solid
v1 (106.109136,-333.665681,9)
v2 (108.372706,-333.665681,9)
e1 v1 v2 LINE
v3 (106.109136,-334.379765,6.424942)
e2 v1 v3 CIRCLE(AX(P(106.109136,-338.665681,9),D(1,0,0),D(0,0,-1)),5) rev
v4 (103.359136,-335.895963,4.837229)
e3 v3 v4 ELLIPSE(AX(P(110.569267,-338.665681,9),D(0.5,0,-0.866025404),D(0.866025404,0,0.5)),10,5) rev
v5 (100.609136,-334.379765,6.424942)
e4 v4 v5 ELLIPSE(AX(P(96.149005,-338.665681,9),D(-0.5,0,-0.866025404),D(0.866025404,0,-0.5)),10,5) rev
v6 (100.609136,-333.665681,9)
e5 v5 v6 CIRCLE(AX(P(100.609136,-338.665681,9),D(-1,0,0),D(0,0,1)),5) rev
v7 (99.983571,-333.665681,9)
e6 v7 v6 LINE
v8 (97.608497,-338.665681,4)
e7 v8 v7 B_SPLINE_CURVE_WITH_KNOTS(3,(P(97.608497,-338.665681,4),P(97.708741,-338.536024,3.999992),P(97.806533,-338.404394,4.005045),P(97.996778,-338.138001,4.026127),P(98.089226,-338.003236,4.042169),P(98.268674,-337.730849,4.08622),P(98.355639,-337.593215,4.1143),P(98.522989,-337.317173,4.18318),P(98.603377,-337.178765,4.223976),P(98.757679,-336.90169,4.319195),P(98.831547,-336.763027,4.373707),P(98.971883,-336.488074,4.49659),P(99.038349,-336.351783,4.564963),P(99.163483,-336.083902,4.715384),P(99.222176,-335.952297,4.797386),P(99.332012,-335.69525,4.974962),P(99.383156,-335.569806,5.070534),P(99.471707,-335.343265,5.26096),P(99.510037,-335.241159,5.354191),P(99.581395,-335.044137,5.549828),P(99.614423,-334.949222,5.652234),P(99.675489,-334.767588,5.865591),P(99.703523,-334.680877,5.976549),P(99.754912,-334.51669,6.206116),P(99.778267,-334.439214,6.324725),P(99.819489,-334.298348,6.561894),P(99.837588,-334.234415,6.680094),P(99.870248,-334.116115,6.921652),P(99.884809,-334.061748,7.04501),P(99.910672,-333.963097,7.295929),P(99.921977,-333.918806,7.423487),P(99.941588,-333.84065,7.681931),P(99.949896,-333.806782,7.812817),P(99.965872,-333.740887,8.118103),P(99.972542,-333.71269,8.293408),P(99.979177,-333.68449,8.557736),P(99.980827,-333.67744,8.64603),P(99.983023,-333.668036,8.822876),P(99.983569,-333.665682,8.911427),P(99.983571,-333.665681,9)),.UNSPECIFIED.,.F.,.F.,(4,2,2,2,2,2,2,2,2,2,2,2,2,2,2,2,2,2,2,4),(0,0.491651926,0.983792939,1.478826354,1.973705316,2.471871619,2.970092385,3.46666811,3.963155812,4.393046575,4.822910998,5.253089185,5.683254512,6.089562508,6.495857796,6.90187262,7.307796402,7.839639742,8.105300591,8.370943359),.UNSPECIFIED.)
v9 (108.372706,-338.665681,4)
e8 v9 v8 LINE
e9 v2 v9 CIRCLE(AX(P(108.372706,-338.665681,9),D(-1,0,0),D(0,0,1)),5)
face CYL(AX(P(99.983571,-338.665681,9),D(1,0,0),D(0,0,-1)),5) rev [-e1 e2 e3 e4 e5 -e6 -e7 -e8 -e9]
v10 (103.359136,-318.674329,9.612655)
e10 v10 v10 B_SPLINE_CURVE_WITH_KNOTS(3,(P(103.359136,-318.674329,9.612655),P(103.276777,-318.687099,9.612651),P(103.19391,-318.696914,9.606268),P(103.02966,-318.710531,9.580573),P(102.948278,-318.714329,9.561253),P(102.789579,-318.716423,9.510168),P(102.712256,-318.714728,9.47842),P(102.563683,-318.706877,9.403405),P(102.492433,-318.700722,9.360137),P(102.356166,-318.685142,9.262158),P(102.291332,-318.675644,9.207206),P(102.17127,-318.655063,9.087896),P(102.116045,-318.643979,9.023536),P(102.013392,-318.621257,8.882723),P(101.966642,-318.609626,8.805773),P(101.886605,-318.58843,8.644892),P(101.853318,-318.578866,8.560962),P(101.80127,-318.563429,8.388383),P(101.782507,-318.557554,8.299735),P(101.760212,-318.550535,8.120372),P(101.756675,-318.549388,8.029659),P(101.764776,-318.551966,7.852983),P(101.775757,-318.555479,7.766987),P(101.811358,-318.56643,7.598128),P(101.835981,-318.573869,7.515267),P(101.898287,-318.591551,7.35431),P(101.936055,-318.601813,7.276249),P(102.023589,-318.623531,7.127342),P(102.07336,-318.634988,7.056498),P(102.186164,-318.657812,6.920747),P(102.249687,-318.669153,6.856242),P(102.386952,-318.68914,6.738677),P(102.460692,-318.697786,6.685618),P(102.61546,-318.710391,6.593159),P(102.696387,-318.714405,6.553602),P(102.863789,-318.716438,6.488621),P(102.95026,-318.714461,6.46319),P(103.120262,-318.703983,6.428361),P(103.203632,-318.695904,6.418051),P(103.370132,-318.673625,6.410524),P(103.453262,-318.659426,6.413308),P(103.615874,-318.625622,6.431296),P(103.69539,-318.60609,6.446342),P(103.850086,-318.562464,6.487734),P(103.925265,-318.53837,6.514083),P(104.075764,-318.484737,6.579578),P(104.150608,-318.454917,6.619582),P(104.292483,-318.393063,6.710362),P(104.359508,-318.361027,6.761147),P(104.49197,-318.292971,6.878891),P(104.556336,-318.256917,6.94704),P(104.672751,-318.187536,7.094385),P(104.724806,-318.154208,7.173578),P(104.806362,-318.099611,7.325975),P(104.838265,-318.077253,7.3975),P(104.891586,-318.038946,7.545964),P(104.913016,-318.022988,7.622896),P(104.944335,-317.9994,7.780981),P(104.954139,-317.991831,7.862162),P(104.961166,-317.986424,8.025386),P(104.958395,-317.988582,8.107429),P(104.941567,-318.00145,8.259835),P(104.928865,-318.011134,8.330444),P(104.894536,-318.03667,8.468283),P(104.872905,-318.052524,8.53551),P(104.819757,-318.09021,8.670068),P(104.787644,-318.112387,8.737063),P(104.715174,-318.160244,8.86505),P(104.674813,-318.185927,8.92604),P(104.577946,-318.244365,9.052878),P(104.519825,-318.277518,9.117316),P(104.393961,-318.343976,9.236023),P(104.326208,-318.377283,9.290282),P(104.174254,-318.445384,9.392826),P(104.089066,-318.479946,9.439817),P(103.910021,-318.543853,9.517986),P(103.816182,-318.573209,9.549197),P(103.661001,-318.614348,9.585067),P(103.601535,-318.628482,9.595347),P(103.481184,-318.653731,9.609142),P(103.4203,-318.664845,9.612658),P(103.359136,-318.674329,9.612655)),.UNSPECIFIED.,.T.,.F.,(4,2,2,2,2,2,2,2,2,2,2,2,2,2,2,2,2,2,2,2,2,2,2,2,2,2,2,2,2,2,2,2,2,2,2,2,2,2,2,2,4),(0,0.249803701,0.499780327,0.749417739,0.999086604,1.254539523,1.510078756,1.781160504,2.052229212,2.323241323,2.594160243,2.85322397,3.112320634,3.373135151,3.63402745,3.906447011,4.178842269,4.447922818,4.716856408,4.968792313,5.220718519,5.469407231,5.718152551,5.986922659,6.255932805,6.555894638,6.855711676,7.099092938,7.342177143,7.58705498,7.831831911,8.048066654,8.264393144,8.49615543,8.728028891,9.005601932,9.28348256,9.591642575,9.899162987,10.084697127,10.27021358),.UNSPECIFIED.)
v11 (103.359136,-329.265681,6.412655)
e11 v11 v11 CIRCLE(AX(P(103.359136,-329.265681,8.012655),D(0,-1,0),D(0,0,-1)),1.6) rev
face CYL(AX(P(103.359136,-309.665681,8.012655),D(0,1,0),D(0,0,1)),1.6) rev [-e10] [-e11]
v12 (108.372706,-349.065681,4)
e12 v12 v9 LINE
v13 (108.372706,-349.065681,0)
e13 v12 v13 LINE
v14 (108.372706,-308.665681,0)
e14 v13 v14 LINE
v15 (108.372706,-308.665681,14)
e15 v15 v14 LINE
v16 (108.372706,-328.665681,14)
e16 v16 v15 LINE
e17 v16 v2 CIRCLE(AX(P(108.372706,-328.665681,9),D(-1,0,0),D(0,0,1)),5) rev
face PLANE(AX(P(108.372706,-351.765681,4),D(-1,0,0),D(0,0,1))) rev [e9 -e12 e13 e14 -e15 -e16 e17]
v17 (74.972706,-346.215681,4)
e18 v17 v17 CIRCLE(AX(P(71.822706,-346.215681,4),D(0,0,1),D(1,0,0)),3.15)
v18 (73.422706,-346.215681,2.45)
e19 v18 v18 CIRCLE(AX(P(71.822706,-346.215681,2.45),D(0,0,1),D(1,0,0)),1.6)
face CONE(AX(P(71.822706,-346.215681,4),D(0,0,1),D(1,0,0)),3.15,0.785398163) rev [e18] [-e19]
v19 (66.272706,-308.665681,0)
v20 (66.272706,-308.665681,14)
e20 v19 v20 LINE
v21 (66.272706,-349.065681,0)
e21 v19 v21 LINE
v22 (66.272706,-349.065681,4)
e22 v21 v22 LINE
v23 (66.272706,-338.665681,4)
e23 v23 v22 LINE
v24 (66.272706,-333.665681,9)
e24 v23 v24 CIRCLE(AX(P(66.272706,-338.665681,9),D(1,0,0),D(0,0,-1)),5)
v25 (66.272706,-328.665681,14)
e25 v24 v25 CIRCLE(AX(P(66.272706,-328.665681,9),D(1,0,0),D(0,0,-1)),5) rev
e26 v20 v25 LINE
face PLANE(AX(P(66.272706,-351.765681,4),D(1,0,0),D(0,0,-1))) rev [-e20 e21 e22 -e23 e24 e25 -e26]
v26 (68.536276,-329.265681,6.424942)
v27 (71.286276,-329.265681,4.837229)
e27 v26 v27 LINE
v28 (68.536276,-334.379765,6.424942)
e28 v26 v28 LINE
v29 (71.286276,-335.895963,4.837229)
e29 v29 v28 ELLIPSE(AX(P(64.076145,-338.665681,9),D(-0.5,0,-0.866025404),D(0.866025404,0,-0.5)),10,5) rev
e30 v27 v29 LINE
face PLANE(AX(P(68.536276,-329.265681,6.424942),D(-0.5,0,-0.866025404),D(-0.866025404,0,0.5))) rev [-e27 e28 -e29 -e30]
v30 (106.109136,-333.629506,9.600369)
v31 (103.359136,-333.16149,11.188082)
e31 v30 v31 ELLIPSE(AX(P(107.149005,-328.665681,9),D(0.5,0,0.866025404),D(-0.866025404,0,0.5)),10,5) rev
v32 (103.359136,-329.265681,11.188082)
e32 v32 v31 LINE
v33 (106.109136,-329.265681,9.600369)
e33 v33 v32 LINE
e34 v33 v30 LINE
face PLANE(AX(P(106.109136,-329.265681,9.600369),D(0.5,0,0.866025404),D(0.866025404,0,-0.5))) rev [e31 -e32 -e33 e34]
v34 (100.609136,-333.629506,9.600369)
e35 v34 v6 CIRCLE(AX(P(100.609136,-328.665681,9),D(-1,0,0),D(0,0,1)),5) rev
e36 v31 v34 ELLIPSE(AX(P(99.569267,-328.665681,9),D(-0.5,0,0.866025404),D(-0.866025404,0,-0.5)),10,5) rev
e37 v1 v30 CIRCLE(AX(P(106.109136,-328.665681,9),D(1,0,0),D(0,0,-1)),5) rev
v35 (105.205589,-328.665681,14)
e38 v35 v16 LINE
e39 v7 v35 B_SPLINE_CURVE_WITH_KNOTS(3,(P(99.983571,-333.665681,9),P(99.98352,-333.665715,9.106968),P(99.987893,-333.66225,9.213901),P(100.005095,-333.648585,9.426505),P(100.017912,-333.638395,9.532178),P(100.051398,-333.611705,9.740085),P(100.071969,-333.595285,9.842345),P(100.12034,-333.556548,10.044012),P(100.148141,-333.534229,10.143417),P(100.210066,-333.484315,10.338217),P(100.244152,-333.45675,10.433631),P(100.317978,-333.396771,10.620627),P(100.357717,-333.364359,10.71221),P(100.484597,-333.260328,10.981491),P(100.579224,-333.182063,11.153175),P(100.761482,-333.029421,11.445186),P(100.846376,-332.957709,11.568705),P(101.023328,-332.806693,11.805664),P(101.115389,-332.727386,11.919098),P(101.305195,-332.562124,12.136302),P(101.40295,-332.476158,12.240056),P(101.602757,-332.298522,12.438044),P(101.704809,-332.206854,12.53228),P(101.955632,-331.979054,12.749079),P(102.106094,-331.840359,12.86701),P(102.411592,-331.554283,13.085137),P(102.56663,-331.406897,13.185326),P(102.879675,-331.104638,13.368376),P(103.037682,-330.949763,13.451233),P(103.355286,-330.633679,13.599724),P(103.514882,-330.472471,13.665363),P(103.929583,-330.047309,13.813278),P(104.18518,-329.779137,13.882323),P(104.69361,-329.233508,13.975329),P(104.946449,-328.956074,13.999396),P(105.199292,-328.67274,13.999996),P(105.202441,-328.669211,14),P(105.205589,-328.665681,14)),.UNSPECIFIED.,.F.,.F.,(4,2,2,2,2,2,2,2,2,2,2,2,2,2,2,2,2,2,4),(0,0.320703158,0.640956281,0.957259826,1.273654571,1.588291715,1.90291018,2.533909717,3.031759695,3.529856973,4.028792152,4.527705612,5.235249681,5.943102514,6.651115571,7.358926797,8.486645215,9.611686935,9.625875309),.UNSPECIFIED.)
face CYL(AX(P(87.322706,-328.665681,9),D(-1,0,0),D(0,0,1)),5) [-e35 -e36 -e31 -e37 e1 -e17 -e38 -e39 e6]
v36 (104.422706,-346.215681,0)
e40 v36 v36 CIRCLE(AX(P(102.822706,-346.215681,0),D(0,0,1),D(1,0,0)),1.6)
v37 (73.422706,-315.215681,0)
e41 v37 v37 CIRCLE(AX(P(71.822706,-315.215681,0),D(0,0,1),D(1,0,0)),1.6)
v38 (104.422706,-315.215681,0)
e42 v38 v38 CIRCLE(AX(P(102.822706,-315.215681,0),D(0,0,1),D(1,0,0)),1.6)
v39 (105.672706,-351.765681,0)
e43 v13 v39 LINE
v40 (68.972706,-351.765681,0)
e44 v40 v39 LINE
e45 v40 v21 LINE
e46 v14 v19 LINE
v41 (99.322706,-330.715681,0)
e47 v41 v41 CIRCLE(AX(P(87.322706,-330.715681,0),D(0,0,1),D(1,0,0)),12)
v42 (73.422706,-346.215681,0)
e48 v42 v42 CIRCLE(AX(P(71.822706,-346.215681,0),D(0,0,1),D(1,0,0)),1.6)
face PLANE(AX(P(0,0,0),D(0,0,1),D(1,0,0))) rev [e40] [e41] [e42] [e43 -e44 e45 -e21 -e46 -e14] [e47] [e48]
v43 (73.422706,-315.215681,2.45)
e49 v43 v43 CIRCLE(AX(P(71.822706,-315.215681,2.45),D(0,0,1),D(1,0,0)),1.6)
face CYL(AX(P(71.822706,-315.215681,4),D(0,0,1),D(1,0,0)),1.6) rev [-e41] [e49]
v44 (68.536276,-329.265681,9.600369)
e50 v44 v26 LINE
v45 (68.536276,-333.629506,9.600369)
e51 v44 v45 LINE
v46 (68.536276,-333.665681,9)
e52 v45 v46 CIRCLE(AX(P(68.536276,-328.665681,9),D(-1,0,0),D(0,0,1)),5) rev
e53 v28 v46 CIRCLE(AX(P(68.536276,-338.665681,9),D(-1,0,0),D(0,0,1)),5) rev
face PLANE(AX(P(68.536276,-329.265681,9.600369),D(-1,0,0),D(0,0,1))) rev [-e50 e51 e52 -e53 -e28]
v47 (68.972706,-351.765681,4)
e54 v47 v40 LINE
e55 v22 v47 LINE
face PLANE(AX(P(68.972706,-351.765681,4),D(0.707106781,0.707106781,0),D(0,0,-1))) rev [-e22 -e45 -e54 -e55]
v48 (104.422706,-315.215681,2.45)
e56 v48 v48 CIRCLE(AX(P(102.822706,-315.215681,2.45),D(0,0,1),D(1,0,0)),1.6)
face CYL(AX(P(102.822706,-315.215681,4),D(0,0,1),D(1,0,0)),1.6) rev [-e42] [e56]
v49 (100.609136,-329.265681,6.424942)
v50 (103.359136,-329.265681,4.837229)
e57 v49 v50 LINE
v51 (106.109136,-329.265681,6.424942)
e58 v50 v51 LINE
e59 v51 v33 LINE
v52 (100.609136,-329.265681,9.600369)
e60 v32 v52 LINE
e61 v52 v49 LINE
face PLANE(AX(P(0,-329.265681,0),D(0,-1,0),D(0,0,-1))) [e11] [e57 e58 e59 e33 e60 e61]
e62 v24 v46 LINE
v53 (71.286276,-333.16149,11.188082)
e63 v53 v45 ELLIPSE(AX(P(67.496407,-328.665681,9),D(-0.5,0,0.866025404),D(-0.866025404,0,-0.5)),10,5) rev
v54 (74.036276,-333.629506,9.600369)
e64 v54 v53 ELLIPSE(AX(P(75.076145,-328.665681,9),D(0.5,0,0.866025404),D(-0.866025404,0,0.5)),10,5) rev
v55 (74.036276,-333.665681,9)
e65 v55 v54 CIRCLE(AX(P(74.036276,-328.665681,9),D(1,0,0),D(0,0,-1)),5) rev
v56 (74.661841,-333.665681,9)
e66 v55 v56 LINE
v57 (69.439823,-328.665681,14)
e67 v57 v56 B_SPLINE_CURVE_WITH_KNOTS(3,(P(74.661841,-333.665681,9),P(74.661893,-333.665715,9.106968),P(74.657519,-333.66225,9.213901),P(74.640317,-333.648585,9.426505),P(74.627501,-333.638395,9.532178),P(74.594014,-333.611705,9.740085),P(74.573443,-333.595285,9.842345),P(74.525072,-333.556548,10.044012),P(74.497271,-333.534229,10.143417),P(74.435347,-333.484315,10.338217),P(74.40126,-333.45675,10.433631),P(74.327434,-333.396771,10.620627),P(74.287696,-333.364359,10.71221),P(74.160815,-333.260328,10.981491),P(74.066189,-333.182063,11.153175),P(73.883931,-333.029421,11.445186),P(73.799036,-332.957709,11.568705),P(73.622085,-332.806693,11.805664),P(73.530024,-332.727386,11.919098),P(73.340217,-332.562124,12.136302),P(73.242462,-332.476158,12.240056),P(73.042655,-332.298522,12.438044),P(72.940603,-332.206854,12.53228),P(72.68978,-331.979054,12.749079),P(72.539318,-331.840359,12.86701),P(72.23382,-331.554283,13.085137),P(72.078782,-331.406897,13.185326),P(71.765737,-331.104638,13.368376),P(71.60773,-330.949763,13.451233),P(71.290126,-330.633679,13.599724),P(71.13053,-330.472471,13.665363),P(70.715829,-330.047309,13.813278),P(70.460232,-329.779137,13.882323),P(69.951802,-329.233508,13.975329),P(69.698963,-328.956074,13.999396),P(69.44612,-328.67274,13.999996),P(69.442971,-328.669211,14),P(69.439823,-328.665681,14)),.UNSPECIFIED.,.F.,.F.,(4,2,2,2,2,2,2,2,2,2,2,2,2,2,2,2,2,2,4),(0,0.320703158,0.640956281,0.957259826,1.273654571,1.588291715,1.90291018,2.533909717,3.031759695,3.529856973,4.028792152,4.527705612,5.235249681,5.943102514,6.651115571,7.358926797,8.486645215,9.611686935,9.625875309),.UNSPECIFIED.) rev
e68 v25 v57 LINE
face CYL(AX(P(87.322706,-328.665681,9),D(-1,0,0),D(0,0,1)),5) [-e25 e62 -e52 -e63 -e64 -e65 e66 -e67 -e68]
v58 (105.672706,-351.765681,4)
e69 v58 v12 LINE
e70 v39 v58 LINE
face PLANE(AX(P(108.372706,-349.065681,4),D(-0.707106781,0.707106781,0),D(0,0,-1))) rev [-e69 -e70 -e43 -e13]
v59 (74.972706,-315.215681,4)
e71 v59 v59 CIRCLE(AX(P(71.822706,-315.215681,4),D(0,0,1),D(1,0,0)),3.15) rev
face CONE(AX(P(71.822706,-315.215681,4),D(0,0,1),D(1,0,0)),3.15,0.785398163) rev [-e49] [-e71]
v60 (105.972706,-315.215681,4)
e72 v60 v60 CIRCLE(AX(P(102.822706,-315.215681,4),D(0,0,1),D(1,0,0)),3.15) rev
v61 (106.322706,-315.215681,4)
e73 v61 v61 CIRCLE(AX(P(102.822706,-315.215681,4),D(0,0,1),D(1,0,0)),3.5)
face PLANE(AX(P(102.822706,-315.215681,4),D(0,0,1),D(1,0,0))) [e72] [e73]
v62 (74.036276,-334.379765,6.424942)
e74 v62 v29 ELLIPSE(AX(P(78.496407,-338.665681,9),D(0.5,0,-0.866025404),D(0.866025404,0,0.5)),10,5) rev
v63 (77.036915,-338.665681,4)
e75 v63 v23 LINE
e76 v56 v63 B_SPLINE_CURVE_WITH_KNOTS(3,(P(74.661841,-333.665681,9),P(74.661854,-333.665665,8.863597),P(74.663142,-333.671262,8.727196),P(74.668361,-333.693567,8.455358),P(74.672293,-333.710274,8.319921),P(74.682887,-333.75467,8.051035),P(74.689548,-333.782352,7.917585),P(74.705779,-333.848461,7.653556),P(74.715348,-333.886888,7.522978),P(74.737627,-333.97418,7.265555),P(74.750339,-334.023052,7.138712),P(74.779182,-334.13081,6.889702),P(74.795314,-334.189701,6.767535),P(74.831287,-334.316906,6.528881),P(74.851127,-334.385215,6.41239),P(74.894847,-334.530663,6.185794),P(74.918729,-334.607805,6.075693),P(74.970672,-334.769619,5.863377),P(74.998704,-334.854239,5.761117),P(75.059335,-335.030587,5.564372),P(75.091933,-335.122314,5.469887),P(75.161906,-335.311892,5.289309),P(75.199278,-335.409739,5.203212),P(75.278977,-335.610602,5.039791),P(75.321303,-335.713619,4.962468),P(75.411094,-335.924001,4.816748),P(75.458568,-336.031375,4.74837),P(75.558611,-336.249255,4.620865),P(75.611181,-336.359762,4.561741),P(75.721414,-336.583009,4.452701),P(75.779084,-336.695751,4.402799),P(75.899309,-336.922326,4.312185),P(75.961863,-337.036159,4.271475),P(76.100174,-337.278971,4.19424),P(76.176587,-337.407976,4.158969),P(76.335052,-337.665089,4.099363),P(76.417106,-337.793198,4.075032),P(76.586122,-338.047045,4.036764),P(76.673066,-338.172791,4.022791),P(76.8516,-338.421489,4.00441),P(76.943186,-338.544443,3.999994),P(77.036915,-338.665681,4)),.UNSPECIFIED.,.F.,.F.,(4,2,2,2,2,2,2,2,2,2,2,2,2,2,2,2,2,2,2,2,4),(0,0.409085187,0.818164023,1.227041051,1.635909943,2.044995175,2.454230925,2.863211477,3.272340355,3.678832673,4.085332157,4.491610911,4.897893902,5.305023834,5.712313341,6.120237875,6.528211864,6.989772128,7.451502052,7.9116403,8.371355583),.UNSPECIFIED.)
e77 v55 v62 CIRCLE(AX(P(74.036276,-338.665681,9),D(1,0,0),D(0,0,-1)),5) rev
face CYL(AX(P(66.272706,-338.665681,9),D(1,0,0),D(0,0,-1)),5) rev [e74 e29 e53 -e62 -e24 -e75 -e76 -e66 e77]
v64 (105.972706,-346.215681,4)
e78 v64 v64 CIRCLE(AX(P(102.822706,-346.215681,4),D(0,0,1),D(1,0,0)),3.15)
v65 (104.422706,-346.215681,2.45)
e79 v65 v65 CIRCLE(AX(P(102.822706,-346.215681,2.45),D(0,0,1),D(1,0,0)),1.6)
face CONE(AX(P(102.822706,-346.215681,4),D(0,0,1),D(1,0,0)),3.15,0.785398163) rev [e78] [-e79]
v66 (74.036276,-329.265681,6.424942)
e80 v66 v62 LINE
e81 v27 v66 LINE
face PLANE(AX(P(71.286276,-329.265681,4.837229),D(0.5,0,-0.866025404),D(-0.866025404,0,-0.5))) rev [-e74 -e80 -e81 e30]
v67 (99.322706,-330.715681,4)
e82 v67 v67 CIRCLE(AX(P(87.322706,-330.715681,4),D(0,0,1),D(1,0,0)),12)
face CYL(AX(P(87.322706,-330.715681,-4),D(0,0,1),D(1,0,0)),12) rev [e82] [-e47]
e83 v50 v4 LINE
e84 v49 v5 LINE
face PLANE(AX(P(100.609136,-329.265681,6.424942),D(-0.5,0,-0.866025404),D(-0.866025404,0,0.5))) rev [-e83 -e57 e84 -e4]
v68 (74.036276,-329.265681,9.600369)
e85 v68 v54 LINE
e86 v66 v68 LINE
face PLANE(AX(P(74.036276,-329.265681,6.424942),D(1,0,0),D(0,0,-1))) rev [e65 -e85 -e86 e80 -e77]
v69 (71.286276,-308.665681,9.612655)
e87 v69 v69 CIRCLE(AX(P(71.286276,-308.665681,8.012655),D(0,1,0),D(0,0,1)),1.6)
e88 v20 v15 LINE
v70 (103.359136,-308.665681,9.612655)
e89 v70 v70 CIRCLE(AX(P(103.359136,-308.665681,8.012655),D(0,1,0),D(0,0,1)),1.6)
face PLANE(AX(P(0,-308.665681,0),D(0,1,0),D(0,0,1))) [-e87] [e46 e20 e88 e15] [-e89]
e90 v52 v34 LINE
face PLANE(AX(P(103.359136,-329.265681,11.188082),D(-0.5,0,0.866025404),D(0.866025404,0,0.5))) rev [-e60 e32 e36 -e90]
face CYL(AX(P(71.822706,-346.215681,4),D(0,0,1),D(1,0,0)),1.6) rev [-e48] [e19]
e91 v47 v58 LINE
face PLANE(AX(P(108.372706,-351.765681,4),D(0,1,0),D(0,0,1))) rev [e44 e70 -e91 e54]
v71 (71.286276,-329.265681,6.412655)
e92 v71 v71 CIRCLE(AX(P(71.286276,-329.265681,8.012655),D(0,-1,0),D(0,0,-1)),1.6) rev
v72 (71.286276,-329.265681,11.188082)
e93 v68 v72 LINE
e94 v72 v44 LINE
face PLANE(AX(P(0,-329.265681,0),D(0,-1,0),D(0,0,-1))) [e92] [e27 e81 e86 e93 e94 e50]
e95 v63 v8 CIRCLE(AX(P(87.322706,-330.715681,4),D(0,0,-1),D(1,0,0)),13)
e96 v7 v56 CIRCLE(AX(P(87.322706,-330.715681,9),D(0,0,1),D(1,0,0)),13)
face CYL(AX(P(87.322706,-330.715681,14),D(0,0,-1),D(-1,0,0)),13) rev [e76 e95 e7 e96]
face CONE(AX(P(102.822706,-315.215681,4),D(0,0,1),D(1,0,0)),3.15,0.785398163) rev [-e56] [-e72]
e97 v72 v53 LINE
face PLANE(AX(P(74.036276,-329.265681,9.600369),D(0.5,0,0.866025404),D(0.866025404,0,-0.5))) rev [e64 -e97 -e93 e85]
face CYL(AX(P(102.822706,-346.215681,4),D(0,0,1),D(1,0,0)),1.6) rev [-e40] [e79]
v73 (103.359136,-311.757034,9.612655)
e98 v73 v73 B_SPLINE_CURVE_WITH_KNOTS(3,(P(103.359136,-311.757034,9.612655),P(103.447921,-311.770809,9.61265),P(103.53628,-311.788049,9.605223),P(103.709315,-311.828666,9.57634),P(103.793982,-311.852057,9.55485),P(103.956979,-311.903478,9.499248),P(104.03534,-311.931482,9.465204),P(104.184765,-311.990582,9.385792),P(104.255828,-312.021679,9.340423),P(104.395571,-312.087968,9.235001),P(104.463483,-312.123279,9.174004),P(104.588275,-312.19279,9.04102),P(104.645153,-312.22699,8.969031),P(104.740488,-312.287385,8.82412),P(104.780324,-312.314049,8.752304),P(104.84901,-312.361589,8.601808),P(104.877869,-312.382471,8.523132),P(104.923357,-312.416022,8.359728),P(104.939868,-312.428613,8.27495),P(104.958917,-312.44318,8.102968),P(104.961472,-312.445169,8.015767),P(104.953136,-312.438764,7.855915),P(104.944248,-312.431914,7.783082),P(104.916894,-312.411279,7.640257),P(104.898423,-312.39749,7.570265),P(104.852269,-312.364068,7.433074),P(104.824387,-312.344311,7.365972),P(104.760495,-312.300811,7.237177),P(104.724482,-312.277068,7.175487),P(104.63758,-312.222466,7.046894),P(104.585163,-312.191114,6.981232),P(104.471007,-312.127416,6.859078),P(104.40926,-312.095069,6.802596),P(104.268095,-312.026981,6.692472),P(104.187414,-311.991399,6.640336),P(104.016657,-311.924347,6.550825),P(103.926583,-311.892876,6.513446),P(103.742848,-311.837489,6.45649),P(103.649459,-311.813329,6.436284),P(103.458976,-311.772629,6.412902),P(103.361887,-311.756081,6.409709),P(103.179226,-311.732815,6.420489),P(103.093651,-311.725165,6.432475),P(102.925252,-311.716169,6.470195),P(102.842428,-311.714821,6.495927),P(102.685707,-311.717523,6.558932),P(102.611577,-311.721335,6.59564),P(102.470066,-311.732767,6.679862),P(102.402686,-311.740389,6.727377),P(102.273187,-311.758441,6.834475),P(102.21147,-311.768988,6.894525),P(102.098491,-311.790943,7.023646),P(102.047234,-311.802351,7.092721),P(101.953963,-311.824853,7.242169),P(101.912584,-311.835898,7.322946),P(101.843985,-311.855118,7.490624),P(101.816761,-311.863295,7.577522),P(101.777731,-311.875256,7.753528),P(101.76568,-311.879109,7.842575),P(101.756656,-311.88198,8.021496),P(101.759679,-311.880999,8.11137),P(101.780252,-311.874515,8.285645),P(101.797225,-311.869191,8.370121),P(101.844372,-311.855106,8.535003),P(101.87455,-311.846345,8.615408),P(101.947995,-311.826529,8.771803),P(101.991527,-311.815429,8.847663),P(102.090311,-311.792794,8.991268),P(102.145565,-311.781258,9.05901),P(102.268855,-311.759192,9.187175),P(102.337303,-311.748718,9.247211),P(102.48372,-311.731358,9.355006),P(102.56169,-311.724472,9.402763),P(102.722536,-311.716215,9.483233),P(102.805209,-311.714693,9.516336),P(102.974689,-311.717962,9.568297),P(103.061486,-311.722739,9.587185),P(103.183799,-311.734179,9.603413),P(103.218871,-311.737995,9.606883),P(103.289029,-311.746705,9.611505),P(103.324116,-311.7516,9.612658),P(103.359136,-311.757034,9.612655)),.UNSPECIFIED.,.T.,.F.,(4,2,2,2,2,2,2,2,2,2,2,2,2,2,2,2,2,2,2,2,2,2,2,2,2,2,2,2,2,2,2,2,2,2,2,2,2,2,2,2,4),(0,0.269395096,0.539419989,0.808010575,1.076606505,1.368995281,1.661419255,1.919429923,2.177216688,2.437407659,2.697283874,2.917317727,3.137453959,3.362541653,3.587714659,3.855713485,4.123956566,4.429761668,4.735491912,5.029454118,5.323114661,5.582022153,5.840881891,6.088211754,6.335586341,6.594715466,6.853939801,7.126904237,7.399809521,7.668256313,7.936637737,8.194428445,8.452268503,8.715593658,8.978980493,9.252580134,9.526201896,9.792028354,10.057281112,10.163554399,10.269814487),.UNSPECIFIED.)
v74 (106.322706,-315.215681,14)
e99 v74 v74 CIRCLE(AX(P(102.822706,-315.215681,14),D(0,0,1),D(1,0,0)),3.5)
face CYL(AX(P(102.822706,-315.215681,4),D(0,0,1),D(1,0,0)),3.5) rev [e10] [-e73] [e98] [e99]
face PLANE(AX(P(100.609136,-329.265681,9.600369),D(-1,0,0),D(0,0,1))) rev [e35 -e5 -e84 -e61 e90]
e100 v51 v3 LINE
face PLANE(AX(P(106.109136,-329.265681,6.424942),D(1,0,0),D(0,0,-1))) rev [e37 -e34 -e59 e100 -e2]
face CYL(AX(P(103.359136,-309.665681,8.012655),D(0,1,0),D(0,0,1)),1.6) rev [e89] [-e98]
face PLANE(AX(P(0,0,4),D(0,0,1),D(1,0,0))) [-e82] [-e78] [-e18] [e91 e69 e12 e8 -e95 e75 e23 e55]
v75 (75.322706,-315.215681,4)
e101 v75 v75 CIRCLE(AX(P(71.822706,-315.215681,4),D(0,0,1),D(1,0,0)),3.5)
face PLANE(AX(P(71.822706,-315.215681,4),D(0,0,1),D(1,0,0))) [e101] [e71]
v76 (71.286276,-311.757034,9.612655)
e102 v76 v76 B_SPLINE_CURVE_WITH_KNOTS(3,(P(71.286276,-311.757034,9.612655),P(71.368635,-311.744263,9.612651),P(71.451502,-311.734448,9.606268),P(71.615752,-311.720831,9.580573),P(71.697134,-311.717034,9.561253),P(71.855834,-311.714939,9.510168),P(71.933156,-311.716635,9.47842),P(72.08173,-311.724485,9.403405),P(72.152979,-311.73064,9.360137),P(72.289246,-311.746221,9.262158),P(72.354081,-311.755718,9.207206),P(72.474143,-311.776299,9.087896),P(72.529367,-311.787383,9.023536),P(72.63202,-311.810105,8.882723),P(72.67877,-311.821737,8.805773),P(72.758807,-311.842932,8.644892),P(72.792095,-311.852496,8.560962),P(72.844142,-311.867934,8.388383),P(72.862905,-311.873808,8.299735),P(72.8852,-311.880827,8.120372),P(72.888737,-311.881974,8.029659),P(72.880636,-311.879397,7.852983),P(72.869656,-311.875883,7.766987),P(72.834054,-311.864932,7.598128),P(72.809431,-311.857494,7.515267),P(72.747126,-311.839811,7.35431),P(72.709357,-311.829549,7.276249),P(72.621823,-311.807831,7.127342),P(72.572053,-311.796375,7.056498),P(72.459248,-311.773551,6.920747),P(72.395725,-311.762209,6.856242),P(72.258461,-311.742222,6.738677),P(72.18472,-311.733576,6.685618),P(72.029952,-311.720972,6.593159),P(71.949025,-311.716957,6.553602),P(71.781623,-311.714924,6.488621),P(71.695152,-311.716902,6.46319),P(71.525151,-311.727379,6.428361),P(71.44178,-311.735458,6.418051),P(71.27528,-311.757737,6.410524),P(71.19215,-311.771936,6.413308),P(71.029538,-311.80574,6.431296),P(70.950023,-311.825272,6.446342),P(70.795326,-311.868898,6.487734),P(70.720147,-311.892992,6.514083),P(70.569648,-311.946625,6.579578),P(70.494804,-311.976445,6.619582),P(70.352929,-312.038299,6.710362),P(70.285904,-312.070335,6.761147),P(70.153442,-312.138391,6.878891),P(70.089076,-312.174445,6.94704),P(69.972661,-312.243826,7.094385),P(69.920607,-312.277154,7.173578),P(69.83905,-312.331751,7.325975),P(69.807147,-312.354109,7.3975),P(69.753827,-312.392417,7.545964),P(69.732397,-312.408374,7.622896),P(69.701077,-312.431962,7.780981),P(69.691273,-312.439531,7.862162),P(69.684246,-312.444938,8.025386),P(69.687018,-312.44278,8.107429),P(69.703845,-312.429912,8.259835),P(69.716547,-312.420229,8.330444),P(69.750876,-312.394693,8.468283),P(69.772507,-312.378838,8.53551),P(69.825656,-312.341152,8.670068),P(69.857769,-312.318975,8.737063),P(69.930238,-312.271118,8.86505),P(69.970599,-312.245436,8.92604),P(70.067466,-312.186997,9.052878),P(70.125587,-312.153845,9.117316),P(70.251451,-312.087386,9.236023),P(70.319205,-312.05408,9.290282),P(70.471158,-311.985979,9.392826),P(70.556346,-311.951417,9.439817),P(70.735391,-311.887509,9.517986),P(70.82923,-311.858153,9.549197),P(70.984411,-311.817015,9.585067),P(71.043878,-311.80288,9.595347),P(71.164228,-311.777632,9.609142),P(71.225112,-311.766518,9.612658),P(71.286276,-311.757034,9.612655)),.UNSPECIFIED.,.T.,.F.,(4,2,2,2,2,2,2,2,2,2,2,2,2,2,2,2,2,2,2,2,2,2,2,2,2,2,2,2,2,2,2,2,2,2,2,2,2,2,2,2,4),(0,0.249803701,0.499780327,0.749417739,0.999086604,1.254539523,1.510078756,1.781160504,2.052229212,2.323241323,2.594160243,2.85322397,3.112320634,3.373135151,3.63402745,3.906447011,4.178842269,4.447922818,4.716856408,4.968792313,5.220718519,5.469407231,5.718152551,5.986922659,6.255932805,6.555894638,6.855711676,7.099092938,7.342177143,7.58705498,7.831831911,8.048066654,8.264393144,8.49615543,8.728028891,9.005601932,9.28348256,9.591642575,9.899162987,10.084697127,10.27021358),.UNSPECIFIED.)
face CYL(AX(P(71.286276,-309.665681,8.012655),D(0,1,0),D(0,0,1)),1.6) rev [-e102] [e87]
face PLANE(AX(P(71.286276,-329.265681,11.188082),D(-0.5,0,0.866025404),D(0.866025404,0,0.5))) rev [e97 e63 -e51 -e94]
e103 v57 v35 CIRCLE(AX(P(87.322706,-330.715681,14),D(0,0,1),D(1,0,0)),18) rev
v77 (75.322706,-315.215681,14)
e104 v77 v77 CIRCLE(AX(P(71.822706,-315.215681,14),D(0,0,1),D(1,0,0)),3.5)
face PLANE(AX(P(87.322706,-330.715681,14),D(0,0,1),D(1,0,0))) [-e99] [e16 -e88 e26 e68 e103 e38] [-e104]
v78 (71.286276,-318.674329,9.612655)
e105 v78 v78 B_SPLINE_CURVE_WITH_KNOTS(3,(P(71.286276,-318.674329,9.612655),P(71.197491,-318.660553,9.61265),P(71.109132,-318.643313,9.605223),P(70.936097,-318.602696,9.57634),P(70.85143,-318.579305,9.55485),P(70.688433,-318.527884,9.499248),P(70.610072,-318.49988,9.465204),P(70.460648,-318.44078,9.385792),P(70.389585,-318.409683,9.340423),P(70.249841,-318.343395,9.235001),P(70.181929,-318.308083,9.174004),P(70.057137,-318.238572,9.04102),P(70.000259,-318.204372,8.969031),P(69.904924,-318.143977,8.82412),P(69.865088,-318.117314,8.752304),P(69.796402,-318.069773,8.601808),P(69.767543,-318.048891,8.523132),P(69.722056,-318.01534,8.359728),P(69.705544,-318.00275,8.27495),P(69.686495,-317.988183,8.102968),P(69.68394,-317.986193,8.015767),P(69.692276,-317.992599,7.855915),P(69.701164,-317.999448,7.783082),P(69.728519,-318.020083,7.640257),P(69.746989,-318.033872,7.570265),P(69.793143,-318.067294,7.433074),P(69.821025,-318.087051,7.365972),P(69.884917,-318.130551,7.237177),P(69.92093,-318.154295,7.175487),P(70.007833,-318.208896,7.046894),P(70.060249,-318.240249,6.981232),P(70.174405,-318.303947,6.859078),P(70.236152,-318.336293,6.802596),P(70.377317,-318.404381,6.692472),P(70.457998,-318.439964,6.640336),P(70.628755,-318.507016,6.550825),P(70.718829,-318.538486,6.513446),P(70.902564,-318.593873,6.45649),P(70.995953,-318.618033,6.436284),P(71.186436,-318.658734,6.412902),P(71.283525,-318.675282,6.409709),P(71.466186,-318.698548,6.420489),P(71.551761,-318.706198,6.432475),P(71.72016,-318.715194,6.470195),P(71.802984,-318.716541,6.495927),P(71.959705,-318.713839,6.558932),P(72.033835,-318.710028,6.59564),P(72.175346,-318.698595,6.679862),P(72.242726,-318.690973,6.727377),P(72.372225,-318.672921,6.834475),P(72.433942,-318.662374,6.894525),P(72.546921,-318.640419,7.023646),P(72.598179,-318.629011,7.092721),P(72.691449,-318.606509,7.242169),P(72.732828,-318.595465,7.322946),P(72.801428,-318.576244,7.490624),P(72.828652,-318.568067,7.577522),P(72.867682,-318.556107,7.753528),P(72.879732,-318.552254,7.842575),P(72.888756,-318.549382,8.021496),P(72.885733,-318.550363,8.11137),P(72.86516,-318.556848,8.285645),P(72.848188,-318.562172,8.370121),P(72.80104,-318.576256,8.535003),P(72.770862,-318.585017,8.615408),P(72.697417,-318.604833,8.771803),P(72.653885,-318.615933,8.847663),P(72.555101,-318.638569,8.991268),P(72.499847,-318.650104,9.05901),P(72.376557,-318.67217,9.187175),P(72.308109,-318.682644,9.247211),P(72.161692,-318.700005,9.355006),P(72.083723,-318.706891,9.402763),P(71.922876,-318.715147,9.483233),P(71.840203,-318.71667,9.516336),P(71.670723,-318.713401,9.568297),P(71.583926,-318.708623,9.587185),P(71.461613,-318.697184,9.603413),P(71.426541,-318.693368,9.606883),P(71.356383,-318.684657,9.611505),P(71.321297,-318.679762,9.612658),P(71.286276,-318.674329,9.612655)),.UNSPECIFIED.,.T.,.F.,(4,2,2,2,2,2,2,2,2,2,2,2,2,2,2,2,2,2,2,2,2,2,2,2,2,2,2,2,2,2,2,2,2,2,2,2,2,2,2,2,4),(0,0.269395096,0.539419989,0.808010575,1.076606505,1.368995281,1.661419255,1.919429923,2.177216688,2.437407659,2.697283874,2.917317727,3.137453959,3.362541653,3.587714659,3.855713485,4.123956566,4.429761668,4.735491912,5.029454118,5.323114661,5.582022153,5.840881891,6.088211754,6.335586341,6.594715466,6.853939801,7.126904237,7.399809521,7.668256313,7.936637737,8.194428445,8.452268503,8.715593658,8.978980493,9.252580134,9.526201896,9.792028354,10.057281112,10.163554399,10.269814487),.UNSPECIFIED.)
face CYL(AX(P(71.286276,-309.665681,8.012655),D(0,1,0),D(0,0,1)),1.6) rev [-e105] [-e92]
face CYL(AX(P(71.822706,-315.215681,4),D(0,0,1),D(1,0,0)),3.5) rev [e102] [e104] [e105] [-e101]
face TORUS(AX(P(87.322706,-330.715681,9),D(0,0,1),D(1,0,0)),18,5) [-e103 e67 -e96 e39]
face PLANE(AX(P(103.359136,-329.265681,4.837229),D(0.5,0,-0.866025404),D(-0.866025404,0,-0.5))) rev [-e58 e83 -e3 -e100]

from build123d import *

# Parameters (mm, degrees)
ESBO_O1_W                                            = 42.10000000000001
ESBO_O1_H                                            = 42.10000000000002
RESSALTO_EXTRUS_O1_DEPTH                             = 4
ESBO_O2_R                                            = 12.000000000000007
CORTE_EXTRUS_O1_DEPTH                                = 8
ESCAREADO_PARA_PARAFUSO_DE_M_QUINA_COM_C_D           = 3.2
ESCAREADO_PARA_PARAFUSO_DE_M_QUINA_COM_C_CSINK_D     = 6.3
ESCAREADO_PARA_PARAFUSO_DE_M_QUINA_COM_C_CSINK_ANGLE = 90
RESSALTO_EXTRUS_O2_DEPTH                             = 10
ESBO_O6_R                                            = 3.5000000000000075
CORTE_EXTRUS_O2_DEPTH                                = 10.000000000000002
FURO_COM_FOLGA_DE_M31_D                              = 3.2
FILETE1_R                                            = 5
CORTE_EXTRUS_O6_DEPTH                                = 22.500000000000007
CHANFRO1_SIZE                                        = 2.7
SKETCH2_W                                            = 42.10000000000001
SKETCH2_H                                            = 14.000000000000002
SKETCH2_R                                            = 1.5999999999999908
BOSS_EXTRUDE1_DEPTH                                  = 1


with BuildPart() as part:
    # Esboço1 → Ressalto-extrusão1 (new body)
    with BuildSketch(Plane.XY):
        with Locations((87.32270610713223, -330.71568115646056)):
            Rectangle(ESBO_O1_W, ESBO_O1_H)
    extrude(amount=RESSALTO_EXTRUS_O1_DEPTH)

    # Esboço2 → Corte-extrusão1 (cut)
    with BuildSketch(Plane.XY.offset(4)):
        with Locations((87.32270610713225, -330.71568115646056)):
            Circle(ESBO_O2_R)
    extrude(amount=-CORTE_EXTRUS_O1_DEPTH, mode=Mode.SUBTRACT)

    # Escareado para parafuso de máquina com cabeça chata de M31 (through all)
    with Locations(Plane.XY.offset(4)):
        with Locations((102.822706107, -346.215681156), (102.822706107, -315.215681156), (71.822706107, -315.215681156), (71.822706107, -346.215681156)):
            CounterSinkHole(ESCAREADO_PARA_PARAFUSO_DE_M_QUINA_COM_C_D / 2, ESCAREADO_PARA_PARAFUSO_DE_M_QUINA_COM_C_CSINK_D / 2, counter_sink_angle=ESCAREADO_PARA_PARAFUSO_DE_M_QUINA_COM_C_CSINK_ANGLE)

    # Esboço5 → Ressalto-extrusão2 (add)
    with BuildSketch(Plane.XY.offset(4)):
        with BuildLine():
            Line((99.98357100649832, -333.66568115646055), (108.37270610713225, -333.66568115646055))
            Line((108.37270610713225, -333.66568115646055), (108.37270610713225, -309.66568115646055))
            Line((108.37270610713225, -309.66568115646055), (66.27270610713224, -309.66568115646055))
            Line((66.27270610713224, -309.66568115646055), (66.27270610713224, -333.66568115646055))
            Line((66.27270610713224, -333.66568115646055), (74.66184120776617, -333.66568115646055))
            ThreePointArc((74.66184120776617, -333.66568115646055), (87.32270610713225, -317.71568115646056), (99.98357100649832, -333.66568115646055))
        make_face()
    extrude(amount=RESSALTO_EXTRUS_O2_DEPTH)

    # Esboço6 → Corte-extrusão2 (cut)
    with BuildSketch(Plane.XY.offset(14)):
        with Locations((71.82270610713223, -315.21568115646056)):
            Circle(ESBO_O6_R)
        with Locations((102.82270610713226, -315.21568115646056)):
            Circle(ESBO_O6_R)
    extrude(amount=-CORTE_EXTRUS_O2_DEPTH, mode=Mode.SUBTRACT)

    # Furo com folga de M31 (through all)
    with Locations(Plane(origin=(0, -309.66568115646055, 0), x_dir=(1, 0, 0), z_dir=(0, 1, 0))):
        with Locations((103.359135837, -8.012655369), (71.286276377, -8.012655369)):
            Hole(FURO_COM_FOLGA_DE_M31_D / 2)

    # Filete1
    # the kernel refuses this fillet: 5 mm, written as the material it adds along each edge
    with BuildSketch(Plane(origin=(87.48357100649832, -333.66568115646055, 4), x_dir=(0, -1, 0), z_dir=(1, 0, 0))) as filete1_piece_1_section:
        with BuildLine():
            CenterArc((FILETE1_R, -FILETE1_R), FILETE1_R, 90, 90)
            Line((0, -FILETE1_R), (0, 0))
            Line((0, 0), (FILETE1_R, 0))
        make_face()
    filete1_piece_1 = extrude(amount=20.889135100633922, mode=Mode.PRIVATE)
    filete1_piece_1 = filete1_piece_1 - Plane(origin=(87.32270610713225, -330.71568115646056, 5.015859225762799), x_dir=(-0.9739126845666216, -0.22692307692307614, 0), z_dir=(0, 0, -1)) * Cylinder(12.999999999999995, 62, mode=Mode.PRIVATE)
    filete1_piece_1 = filete1_piece_1 - Plane(origin=(103.359135837, -334.8905504329836, 8.012655369), x_dir=(-1, 0, 0), z_dir=(0, -1, 0)) * Cylinder(1.6, 62, mode=Mode.PRIVATE)
    add(filete1_piece_1)
    with BuildSketch(Plane(origin=(66.27270610713224, -333.66568115646055, 4), x_dir=(0, -1, 0), z_dir=(1, 0, 0))) as filete1_piece_2_section:
        with BuildLine():
            CenterArc((FILETE1_R, -FILETE1_R), FILETE1_R, 90, 90)
            Line((0, -FILETE1_R), (0, 0))
            Line((0, 0), (FILETE1_R, 0))
        make_face()
    filete1_piece_2 = extrude(amount=20.889135100633936, mode=Mode.PRIVATE)
    filete1_piece_2 = filete1_piece_2 - Plane(origin=(87.32270610713225, -330.71568115646056, 5.01585849038902), x_dir=(-0.9739126845666216, -0.22692307692307614, 0), z_dir=(0, 0, -1)) * Cylinder(12.999999999999995, 62, mode=Mode.PRIVATE)
    filete1_piece_2 = filete1_piece_2 - Plane(origin=(71.286276377, -334.8905494522985, 8.012655369), x_dir=(-1, 0, 0), z_dir=(0, -1, 0)) * Cylinder(1.6, 62, mode=Mode.PRIVATE)
    add(filete1_piece_2)
    # the kernel refuses this fillet: 5 mm, written as the material it takes off along each edge
    with BuildSketch(Plane(origin=(87.32270610713225, -330.71568115646056, 14), x_dir=(-0.36935058707522056, -0.9292901289840487, 0), z_dir=(0.9292901289840487, -0.36935058707522056, 0))) as filete1_2_piece_1:
        with BuildLine():
            CenterArc((12.999999999999979 + FILETE1_R, FILETE1_R), FILETE1_R, 180, 90)
            Line((12.999999999999979 + FILETE1_R, 0), (12.999999999999979, 0))
            Line((12.999999999999979, 0), (12.999999999999984, FILETE1_R))
        make_face()
    revolve(axis=Axis((87.32270610713225, -330.71568115646056, 14), (0, 0, -1)), revolution_arc=316.648856226302, mode=Mode.SUBTRACT)
    with BuildSketch(Plane(origin=(87.48357100649832, -333.66568115646055, 14), x_dir=(0, 0, -1), z_dir=(1, 0, 0))) as filete1_2_piece_2:
        with BuildLine():
            CenterArc((FILETE1_R, FILETE1_R), FILETE1_R, 180, 90)
            Line((0, FILETE1_R), (0, 0))
            Line((0, 0), (FILETE1_R, 0))
        make_face()
    extrude(amount=33.38913510063392, mode=Mode.SUBTRACT)
    with BuildSketch(Plane(origin=(53.77270610713224, -333.66568115646055, 14), x_dir=(0, 1, 0), z_dir=(1, 0, 0))) as filete1_2_piece_3:
        with BuildLine():
            CenterArc((FILETE1_R, -FILETE1_R), FILETE1_R, 90, 90)
            Line((0, -FILETE1_R), (0, 0))
            Line((0, 0), (FILETE1_R, 0))
        make_face()
    extrude(amount=33.389135100633936, mode=Mode.SUBTRACT)

    # Esboço13 → Corte-extrusão6 (cut)
    with BuildSketch(Plane.XZ.offset(351.7656811564606)):
        Polygon((74.0362763774125, 9.60036860941331), (71.28627637741243, 11.188081849684735), (68.53627637741243, 9.600368609413174), (68.53627637741253, 6.424942128870199), (71.2862763774126, 4.837228888598795), (74.03627637741259, 6.424942128870374), align=None)
        Polygon((106.10913583685199, 9.600368609413255), (103.35913583685196, 11.188081849684727), (100.60913583685196, 9.600368609413236), (100.60913583685199, 6.424942128870286), (103.359135836852, 4.837228888598834), (106.109135836852, 6.424942128870341), align=None)
    extrude(amount=-CORTE_EXTRUS_O6_DEPTH, mode=Mode.SUBTRACT)

    # Chanfro1
    chanfro1_edges = [part.edges().sort_by_distance(p)[0] for p in [
        (66.27270610713224, -351.7656811564606, 2),
        (108.37270610713225, -351.7656811564606, 2),
    ]]
    chamfer(chanfro1_edges, length=CHANFRO1_SIZE)

    # Sketch2 → Boss-Extrude1 (add)
    with BuildSketch(Plane(origin=(0, -309.66568115646055, 0), x_dir=(1, 0, 0), z_dir=(0, 1, 0))):
        with Locations((87.32270610713223, -7.000000000000001)):
            Rectangle(SKETCH2_W, SKETCH2_H)
        with Locations(Location((71.2862763774125, -8.012655369141836, 0), (0, 0, 270))):
            Circle(SKETCH2_R, mode=Mode.SUBTRACT)
        with Locations(Location((103.35913583685199, -8.012655369141836, 0), (0, 0, 270))):
            Circle(SKETCH2_R, mode=Mode.SUBTRACT)
    extrude(amount=BOSS_EXTRUDE1_DEPTH)


solid = part.part
